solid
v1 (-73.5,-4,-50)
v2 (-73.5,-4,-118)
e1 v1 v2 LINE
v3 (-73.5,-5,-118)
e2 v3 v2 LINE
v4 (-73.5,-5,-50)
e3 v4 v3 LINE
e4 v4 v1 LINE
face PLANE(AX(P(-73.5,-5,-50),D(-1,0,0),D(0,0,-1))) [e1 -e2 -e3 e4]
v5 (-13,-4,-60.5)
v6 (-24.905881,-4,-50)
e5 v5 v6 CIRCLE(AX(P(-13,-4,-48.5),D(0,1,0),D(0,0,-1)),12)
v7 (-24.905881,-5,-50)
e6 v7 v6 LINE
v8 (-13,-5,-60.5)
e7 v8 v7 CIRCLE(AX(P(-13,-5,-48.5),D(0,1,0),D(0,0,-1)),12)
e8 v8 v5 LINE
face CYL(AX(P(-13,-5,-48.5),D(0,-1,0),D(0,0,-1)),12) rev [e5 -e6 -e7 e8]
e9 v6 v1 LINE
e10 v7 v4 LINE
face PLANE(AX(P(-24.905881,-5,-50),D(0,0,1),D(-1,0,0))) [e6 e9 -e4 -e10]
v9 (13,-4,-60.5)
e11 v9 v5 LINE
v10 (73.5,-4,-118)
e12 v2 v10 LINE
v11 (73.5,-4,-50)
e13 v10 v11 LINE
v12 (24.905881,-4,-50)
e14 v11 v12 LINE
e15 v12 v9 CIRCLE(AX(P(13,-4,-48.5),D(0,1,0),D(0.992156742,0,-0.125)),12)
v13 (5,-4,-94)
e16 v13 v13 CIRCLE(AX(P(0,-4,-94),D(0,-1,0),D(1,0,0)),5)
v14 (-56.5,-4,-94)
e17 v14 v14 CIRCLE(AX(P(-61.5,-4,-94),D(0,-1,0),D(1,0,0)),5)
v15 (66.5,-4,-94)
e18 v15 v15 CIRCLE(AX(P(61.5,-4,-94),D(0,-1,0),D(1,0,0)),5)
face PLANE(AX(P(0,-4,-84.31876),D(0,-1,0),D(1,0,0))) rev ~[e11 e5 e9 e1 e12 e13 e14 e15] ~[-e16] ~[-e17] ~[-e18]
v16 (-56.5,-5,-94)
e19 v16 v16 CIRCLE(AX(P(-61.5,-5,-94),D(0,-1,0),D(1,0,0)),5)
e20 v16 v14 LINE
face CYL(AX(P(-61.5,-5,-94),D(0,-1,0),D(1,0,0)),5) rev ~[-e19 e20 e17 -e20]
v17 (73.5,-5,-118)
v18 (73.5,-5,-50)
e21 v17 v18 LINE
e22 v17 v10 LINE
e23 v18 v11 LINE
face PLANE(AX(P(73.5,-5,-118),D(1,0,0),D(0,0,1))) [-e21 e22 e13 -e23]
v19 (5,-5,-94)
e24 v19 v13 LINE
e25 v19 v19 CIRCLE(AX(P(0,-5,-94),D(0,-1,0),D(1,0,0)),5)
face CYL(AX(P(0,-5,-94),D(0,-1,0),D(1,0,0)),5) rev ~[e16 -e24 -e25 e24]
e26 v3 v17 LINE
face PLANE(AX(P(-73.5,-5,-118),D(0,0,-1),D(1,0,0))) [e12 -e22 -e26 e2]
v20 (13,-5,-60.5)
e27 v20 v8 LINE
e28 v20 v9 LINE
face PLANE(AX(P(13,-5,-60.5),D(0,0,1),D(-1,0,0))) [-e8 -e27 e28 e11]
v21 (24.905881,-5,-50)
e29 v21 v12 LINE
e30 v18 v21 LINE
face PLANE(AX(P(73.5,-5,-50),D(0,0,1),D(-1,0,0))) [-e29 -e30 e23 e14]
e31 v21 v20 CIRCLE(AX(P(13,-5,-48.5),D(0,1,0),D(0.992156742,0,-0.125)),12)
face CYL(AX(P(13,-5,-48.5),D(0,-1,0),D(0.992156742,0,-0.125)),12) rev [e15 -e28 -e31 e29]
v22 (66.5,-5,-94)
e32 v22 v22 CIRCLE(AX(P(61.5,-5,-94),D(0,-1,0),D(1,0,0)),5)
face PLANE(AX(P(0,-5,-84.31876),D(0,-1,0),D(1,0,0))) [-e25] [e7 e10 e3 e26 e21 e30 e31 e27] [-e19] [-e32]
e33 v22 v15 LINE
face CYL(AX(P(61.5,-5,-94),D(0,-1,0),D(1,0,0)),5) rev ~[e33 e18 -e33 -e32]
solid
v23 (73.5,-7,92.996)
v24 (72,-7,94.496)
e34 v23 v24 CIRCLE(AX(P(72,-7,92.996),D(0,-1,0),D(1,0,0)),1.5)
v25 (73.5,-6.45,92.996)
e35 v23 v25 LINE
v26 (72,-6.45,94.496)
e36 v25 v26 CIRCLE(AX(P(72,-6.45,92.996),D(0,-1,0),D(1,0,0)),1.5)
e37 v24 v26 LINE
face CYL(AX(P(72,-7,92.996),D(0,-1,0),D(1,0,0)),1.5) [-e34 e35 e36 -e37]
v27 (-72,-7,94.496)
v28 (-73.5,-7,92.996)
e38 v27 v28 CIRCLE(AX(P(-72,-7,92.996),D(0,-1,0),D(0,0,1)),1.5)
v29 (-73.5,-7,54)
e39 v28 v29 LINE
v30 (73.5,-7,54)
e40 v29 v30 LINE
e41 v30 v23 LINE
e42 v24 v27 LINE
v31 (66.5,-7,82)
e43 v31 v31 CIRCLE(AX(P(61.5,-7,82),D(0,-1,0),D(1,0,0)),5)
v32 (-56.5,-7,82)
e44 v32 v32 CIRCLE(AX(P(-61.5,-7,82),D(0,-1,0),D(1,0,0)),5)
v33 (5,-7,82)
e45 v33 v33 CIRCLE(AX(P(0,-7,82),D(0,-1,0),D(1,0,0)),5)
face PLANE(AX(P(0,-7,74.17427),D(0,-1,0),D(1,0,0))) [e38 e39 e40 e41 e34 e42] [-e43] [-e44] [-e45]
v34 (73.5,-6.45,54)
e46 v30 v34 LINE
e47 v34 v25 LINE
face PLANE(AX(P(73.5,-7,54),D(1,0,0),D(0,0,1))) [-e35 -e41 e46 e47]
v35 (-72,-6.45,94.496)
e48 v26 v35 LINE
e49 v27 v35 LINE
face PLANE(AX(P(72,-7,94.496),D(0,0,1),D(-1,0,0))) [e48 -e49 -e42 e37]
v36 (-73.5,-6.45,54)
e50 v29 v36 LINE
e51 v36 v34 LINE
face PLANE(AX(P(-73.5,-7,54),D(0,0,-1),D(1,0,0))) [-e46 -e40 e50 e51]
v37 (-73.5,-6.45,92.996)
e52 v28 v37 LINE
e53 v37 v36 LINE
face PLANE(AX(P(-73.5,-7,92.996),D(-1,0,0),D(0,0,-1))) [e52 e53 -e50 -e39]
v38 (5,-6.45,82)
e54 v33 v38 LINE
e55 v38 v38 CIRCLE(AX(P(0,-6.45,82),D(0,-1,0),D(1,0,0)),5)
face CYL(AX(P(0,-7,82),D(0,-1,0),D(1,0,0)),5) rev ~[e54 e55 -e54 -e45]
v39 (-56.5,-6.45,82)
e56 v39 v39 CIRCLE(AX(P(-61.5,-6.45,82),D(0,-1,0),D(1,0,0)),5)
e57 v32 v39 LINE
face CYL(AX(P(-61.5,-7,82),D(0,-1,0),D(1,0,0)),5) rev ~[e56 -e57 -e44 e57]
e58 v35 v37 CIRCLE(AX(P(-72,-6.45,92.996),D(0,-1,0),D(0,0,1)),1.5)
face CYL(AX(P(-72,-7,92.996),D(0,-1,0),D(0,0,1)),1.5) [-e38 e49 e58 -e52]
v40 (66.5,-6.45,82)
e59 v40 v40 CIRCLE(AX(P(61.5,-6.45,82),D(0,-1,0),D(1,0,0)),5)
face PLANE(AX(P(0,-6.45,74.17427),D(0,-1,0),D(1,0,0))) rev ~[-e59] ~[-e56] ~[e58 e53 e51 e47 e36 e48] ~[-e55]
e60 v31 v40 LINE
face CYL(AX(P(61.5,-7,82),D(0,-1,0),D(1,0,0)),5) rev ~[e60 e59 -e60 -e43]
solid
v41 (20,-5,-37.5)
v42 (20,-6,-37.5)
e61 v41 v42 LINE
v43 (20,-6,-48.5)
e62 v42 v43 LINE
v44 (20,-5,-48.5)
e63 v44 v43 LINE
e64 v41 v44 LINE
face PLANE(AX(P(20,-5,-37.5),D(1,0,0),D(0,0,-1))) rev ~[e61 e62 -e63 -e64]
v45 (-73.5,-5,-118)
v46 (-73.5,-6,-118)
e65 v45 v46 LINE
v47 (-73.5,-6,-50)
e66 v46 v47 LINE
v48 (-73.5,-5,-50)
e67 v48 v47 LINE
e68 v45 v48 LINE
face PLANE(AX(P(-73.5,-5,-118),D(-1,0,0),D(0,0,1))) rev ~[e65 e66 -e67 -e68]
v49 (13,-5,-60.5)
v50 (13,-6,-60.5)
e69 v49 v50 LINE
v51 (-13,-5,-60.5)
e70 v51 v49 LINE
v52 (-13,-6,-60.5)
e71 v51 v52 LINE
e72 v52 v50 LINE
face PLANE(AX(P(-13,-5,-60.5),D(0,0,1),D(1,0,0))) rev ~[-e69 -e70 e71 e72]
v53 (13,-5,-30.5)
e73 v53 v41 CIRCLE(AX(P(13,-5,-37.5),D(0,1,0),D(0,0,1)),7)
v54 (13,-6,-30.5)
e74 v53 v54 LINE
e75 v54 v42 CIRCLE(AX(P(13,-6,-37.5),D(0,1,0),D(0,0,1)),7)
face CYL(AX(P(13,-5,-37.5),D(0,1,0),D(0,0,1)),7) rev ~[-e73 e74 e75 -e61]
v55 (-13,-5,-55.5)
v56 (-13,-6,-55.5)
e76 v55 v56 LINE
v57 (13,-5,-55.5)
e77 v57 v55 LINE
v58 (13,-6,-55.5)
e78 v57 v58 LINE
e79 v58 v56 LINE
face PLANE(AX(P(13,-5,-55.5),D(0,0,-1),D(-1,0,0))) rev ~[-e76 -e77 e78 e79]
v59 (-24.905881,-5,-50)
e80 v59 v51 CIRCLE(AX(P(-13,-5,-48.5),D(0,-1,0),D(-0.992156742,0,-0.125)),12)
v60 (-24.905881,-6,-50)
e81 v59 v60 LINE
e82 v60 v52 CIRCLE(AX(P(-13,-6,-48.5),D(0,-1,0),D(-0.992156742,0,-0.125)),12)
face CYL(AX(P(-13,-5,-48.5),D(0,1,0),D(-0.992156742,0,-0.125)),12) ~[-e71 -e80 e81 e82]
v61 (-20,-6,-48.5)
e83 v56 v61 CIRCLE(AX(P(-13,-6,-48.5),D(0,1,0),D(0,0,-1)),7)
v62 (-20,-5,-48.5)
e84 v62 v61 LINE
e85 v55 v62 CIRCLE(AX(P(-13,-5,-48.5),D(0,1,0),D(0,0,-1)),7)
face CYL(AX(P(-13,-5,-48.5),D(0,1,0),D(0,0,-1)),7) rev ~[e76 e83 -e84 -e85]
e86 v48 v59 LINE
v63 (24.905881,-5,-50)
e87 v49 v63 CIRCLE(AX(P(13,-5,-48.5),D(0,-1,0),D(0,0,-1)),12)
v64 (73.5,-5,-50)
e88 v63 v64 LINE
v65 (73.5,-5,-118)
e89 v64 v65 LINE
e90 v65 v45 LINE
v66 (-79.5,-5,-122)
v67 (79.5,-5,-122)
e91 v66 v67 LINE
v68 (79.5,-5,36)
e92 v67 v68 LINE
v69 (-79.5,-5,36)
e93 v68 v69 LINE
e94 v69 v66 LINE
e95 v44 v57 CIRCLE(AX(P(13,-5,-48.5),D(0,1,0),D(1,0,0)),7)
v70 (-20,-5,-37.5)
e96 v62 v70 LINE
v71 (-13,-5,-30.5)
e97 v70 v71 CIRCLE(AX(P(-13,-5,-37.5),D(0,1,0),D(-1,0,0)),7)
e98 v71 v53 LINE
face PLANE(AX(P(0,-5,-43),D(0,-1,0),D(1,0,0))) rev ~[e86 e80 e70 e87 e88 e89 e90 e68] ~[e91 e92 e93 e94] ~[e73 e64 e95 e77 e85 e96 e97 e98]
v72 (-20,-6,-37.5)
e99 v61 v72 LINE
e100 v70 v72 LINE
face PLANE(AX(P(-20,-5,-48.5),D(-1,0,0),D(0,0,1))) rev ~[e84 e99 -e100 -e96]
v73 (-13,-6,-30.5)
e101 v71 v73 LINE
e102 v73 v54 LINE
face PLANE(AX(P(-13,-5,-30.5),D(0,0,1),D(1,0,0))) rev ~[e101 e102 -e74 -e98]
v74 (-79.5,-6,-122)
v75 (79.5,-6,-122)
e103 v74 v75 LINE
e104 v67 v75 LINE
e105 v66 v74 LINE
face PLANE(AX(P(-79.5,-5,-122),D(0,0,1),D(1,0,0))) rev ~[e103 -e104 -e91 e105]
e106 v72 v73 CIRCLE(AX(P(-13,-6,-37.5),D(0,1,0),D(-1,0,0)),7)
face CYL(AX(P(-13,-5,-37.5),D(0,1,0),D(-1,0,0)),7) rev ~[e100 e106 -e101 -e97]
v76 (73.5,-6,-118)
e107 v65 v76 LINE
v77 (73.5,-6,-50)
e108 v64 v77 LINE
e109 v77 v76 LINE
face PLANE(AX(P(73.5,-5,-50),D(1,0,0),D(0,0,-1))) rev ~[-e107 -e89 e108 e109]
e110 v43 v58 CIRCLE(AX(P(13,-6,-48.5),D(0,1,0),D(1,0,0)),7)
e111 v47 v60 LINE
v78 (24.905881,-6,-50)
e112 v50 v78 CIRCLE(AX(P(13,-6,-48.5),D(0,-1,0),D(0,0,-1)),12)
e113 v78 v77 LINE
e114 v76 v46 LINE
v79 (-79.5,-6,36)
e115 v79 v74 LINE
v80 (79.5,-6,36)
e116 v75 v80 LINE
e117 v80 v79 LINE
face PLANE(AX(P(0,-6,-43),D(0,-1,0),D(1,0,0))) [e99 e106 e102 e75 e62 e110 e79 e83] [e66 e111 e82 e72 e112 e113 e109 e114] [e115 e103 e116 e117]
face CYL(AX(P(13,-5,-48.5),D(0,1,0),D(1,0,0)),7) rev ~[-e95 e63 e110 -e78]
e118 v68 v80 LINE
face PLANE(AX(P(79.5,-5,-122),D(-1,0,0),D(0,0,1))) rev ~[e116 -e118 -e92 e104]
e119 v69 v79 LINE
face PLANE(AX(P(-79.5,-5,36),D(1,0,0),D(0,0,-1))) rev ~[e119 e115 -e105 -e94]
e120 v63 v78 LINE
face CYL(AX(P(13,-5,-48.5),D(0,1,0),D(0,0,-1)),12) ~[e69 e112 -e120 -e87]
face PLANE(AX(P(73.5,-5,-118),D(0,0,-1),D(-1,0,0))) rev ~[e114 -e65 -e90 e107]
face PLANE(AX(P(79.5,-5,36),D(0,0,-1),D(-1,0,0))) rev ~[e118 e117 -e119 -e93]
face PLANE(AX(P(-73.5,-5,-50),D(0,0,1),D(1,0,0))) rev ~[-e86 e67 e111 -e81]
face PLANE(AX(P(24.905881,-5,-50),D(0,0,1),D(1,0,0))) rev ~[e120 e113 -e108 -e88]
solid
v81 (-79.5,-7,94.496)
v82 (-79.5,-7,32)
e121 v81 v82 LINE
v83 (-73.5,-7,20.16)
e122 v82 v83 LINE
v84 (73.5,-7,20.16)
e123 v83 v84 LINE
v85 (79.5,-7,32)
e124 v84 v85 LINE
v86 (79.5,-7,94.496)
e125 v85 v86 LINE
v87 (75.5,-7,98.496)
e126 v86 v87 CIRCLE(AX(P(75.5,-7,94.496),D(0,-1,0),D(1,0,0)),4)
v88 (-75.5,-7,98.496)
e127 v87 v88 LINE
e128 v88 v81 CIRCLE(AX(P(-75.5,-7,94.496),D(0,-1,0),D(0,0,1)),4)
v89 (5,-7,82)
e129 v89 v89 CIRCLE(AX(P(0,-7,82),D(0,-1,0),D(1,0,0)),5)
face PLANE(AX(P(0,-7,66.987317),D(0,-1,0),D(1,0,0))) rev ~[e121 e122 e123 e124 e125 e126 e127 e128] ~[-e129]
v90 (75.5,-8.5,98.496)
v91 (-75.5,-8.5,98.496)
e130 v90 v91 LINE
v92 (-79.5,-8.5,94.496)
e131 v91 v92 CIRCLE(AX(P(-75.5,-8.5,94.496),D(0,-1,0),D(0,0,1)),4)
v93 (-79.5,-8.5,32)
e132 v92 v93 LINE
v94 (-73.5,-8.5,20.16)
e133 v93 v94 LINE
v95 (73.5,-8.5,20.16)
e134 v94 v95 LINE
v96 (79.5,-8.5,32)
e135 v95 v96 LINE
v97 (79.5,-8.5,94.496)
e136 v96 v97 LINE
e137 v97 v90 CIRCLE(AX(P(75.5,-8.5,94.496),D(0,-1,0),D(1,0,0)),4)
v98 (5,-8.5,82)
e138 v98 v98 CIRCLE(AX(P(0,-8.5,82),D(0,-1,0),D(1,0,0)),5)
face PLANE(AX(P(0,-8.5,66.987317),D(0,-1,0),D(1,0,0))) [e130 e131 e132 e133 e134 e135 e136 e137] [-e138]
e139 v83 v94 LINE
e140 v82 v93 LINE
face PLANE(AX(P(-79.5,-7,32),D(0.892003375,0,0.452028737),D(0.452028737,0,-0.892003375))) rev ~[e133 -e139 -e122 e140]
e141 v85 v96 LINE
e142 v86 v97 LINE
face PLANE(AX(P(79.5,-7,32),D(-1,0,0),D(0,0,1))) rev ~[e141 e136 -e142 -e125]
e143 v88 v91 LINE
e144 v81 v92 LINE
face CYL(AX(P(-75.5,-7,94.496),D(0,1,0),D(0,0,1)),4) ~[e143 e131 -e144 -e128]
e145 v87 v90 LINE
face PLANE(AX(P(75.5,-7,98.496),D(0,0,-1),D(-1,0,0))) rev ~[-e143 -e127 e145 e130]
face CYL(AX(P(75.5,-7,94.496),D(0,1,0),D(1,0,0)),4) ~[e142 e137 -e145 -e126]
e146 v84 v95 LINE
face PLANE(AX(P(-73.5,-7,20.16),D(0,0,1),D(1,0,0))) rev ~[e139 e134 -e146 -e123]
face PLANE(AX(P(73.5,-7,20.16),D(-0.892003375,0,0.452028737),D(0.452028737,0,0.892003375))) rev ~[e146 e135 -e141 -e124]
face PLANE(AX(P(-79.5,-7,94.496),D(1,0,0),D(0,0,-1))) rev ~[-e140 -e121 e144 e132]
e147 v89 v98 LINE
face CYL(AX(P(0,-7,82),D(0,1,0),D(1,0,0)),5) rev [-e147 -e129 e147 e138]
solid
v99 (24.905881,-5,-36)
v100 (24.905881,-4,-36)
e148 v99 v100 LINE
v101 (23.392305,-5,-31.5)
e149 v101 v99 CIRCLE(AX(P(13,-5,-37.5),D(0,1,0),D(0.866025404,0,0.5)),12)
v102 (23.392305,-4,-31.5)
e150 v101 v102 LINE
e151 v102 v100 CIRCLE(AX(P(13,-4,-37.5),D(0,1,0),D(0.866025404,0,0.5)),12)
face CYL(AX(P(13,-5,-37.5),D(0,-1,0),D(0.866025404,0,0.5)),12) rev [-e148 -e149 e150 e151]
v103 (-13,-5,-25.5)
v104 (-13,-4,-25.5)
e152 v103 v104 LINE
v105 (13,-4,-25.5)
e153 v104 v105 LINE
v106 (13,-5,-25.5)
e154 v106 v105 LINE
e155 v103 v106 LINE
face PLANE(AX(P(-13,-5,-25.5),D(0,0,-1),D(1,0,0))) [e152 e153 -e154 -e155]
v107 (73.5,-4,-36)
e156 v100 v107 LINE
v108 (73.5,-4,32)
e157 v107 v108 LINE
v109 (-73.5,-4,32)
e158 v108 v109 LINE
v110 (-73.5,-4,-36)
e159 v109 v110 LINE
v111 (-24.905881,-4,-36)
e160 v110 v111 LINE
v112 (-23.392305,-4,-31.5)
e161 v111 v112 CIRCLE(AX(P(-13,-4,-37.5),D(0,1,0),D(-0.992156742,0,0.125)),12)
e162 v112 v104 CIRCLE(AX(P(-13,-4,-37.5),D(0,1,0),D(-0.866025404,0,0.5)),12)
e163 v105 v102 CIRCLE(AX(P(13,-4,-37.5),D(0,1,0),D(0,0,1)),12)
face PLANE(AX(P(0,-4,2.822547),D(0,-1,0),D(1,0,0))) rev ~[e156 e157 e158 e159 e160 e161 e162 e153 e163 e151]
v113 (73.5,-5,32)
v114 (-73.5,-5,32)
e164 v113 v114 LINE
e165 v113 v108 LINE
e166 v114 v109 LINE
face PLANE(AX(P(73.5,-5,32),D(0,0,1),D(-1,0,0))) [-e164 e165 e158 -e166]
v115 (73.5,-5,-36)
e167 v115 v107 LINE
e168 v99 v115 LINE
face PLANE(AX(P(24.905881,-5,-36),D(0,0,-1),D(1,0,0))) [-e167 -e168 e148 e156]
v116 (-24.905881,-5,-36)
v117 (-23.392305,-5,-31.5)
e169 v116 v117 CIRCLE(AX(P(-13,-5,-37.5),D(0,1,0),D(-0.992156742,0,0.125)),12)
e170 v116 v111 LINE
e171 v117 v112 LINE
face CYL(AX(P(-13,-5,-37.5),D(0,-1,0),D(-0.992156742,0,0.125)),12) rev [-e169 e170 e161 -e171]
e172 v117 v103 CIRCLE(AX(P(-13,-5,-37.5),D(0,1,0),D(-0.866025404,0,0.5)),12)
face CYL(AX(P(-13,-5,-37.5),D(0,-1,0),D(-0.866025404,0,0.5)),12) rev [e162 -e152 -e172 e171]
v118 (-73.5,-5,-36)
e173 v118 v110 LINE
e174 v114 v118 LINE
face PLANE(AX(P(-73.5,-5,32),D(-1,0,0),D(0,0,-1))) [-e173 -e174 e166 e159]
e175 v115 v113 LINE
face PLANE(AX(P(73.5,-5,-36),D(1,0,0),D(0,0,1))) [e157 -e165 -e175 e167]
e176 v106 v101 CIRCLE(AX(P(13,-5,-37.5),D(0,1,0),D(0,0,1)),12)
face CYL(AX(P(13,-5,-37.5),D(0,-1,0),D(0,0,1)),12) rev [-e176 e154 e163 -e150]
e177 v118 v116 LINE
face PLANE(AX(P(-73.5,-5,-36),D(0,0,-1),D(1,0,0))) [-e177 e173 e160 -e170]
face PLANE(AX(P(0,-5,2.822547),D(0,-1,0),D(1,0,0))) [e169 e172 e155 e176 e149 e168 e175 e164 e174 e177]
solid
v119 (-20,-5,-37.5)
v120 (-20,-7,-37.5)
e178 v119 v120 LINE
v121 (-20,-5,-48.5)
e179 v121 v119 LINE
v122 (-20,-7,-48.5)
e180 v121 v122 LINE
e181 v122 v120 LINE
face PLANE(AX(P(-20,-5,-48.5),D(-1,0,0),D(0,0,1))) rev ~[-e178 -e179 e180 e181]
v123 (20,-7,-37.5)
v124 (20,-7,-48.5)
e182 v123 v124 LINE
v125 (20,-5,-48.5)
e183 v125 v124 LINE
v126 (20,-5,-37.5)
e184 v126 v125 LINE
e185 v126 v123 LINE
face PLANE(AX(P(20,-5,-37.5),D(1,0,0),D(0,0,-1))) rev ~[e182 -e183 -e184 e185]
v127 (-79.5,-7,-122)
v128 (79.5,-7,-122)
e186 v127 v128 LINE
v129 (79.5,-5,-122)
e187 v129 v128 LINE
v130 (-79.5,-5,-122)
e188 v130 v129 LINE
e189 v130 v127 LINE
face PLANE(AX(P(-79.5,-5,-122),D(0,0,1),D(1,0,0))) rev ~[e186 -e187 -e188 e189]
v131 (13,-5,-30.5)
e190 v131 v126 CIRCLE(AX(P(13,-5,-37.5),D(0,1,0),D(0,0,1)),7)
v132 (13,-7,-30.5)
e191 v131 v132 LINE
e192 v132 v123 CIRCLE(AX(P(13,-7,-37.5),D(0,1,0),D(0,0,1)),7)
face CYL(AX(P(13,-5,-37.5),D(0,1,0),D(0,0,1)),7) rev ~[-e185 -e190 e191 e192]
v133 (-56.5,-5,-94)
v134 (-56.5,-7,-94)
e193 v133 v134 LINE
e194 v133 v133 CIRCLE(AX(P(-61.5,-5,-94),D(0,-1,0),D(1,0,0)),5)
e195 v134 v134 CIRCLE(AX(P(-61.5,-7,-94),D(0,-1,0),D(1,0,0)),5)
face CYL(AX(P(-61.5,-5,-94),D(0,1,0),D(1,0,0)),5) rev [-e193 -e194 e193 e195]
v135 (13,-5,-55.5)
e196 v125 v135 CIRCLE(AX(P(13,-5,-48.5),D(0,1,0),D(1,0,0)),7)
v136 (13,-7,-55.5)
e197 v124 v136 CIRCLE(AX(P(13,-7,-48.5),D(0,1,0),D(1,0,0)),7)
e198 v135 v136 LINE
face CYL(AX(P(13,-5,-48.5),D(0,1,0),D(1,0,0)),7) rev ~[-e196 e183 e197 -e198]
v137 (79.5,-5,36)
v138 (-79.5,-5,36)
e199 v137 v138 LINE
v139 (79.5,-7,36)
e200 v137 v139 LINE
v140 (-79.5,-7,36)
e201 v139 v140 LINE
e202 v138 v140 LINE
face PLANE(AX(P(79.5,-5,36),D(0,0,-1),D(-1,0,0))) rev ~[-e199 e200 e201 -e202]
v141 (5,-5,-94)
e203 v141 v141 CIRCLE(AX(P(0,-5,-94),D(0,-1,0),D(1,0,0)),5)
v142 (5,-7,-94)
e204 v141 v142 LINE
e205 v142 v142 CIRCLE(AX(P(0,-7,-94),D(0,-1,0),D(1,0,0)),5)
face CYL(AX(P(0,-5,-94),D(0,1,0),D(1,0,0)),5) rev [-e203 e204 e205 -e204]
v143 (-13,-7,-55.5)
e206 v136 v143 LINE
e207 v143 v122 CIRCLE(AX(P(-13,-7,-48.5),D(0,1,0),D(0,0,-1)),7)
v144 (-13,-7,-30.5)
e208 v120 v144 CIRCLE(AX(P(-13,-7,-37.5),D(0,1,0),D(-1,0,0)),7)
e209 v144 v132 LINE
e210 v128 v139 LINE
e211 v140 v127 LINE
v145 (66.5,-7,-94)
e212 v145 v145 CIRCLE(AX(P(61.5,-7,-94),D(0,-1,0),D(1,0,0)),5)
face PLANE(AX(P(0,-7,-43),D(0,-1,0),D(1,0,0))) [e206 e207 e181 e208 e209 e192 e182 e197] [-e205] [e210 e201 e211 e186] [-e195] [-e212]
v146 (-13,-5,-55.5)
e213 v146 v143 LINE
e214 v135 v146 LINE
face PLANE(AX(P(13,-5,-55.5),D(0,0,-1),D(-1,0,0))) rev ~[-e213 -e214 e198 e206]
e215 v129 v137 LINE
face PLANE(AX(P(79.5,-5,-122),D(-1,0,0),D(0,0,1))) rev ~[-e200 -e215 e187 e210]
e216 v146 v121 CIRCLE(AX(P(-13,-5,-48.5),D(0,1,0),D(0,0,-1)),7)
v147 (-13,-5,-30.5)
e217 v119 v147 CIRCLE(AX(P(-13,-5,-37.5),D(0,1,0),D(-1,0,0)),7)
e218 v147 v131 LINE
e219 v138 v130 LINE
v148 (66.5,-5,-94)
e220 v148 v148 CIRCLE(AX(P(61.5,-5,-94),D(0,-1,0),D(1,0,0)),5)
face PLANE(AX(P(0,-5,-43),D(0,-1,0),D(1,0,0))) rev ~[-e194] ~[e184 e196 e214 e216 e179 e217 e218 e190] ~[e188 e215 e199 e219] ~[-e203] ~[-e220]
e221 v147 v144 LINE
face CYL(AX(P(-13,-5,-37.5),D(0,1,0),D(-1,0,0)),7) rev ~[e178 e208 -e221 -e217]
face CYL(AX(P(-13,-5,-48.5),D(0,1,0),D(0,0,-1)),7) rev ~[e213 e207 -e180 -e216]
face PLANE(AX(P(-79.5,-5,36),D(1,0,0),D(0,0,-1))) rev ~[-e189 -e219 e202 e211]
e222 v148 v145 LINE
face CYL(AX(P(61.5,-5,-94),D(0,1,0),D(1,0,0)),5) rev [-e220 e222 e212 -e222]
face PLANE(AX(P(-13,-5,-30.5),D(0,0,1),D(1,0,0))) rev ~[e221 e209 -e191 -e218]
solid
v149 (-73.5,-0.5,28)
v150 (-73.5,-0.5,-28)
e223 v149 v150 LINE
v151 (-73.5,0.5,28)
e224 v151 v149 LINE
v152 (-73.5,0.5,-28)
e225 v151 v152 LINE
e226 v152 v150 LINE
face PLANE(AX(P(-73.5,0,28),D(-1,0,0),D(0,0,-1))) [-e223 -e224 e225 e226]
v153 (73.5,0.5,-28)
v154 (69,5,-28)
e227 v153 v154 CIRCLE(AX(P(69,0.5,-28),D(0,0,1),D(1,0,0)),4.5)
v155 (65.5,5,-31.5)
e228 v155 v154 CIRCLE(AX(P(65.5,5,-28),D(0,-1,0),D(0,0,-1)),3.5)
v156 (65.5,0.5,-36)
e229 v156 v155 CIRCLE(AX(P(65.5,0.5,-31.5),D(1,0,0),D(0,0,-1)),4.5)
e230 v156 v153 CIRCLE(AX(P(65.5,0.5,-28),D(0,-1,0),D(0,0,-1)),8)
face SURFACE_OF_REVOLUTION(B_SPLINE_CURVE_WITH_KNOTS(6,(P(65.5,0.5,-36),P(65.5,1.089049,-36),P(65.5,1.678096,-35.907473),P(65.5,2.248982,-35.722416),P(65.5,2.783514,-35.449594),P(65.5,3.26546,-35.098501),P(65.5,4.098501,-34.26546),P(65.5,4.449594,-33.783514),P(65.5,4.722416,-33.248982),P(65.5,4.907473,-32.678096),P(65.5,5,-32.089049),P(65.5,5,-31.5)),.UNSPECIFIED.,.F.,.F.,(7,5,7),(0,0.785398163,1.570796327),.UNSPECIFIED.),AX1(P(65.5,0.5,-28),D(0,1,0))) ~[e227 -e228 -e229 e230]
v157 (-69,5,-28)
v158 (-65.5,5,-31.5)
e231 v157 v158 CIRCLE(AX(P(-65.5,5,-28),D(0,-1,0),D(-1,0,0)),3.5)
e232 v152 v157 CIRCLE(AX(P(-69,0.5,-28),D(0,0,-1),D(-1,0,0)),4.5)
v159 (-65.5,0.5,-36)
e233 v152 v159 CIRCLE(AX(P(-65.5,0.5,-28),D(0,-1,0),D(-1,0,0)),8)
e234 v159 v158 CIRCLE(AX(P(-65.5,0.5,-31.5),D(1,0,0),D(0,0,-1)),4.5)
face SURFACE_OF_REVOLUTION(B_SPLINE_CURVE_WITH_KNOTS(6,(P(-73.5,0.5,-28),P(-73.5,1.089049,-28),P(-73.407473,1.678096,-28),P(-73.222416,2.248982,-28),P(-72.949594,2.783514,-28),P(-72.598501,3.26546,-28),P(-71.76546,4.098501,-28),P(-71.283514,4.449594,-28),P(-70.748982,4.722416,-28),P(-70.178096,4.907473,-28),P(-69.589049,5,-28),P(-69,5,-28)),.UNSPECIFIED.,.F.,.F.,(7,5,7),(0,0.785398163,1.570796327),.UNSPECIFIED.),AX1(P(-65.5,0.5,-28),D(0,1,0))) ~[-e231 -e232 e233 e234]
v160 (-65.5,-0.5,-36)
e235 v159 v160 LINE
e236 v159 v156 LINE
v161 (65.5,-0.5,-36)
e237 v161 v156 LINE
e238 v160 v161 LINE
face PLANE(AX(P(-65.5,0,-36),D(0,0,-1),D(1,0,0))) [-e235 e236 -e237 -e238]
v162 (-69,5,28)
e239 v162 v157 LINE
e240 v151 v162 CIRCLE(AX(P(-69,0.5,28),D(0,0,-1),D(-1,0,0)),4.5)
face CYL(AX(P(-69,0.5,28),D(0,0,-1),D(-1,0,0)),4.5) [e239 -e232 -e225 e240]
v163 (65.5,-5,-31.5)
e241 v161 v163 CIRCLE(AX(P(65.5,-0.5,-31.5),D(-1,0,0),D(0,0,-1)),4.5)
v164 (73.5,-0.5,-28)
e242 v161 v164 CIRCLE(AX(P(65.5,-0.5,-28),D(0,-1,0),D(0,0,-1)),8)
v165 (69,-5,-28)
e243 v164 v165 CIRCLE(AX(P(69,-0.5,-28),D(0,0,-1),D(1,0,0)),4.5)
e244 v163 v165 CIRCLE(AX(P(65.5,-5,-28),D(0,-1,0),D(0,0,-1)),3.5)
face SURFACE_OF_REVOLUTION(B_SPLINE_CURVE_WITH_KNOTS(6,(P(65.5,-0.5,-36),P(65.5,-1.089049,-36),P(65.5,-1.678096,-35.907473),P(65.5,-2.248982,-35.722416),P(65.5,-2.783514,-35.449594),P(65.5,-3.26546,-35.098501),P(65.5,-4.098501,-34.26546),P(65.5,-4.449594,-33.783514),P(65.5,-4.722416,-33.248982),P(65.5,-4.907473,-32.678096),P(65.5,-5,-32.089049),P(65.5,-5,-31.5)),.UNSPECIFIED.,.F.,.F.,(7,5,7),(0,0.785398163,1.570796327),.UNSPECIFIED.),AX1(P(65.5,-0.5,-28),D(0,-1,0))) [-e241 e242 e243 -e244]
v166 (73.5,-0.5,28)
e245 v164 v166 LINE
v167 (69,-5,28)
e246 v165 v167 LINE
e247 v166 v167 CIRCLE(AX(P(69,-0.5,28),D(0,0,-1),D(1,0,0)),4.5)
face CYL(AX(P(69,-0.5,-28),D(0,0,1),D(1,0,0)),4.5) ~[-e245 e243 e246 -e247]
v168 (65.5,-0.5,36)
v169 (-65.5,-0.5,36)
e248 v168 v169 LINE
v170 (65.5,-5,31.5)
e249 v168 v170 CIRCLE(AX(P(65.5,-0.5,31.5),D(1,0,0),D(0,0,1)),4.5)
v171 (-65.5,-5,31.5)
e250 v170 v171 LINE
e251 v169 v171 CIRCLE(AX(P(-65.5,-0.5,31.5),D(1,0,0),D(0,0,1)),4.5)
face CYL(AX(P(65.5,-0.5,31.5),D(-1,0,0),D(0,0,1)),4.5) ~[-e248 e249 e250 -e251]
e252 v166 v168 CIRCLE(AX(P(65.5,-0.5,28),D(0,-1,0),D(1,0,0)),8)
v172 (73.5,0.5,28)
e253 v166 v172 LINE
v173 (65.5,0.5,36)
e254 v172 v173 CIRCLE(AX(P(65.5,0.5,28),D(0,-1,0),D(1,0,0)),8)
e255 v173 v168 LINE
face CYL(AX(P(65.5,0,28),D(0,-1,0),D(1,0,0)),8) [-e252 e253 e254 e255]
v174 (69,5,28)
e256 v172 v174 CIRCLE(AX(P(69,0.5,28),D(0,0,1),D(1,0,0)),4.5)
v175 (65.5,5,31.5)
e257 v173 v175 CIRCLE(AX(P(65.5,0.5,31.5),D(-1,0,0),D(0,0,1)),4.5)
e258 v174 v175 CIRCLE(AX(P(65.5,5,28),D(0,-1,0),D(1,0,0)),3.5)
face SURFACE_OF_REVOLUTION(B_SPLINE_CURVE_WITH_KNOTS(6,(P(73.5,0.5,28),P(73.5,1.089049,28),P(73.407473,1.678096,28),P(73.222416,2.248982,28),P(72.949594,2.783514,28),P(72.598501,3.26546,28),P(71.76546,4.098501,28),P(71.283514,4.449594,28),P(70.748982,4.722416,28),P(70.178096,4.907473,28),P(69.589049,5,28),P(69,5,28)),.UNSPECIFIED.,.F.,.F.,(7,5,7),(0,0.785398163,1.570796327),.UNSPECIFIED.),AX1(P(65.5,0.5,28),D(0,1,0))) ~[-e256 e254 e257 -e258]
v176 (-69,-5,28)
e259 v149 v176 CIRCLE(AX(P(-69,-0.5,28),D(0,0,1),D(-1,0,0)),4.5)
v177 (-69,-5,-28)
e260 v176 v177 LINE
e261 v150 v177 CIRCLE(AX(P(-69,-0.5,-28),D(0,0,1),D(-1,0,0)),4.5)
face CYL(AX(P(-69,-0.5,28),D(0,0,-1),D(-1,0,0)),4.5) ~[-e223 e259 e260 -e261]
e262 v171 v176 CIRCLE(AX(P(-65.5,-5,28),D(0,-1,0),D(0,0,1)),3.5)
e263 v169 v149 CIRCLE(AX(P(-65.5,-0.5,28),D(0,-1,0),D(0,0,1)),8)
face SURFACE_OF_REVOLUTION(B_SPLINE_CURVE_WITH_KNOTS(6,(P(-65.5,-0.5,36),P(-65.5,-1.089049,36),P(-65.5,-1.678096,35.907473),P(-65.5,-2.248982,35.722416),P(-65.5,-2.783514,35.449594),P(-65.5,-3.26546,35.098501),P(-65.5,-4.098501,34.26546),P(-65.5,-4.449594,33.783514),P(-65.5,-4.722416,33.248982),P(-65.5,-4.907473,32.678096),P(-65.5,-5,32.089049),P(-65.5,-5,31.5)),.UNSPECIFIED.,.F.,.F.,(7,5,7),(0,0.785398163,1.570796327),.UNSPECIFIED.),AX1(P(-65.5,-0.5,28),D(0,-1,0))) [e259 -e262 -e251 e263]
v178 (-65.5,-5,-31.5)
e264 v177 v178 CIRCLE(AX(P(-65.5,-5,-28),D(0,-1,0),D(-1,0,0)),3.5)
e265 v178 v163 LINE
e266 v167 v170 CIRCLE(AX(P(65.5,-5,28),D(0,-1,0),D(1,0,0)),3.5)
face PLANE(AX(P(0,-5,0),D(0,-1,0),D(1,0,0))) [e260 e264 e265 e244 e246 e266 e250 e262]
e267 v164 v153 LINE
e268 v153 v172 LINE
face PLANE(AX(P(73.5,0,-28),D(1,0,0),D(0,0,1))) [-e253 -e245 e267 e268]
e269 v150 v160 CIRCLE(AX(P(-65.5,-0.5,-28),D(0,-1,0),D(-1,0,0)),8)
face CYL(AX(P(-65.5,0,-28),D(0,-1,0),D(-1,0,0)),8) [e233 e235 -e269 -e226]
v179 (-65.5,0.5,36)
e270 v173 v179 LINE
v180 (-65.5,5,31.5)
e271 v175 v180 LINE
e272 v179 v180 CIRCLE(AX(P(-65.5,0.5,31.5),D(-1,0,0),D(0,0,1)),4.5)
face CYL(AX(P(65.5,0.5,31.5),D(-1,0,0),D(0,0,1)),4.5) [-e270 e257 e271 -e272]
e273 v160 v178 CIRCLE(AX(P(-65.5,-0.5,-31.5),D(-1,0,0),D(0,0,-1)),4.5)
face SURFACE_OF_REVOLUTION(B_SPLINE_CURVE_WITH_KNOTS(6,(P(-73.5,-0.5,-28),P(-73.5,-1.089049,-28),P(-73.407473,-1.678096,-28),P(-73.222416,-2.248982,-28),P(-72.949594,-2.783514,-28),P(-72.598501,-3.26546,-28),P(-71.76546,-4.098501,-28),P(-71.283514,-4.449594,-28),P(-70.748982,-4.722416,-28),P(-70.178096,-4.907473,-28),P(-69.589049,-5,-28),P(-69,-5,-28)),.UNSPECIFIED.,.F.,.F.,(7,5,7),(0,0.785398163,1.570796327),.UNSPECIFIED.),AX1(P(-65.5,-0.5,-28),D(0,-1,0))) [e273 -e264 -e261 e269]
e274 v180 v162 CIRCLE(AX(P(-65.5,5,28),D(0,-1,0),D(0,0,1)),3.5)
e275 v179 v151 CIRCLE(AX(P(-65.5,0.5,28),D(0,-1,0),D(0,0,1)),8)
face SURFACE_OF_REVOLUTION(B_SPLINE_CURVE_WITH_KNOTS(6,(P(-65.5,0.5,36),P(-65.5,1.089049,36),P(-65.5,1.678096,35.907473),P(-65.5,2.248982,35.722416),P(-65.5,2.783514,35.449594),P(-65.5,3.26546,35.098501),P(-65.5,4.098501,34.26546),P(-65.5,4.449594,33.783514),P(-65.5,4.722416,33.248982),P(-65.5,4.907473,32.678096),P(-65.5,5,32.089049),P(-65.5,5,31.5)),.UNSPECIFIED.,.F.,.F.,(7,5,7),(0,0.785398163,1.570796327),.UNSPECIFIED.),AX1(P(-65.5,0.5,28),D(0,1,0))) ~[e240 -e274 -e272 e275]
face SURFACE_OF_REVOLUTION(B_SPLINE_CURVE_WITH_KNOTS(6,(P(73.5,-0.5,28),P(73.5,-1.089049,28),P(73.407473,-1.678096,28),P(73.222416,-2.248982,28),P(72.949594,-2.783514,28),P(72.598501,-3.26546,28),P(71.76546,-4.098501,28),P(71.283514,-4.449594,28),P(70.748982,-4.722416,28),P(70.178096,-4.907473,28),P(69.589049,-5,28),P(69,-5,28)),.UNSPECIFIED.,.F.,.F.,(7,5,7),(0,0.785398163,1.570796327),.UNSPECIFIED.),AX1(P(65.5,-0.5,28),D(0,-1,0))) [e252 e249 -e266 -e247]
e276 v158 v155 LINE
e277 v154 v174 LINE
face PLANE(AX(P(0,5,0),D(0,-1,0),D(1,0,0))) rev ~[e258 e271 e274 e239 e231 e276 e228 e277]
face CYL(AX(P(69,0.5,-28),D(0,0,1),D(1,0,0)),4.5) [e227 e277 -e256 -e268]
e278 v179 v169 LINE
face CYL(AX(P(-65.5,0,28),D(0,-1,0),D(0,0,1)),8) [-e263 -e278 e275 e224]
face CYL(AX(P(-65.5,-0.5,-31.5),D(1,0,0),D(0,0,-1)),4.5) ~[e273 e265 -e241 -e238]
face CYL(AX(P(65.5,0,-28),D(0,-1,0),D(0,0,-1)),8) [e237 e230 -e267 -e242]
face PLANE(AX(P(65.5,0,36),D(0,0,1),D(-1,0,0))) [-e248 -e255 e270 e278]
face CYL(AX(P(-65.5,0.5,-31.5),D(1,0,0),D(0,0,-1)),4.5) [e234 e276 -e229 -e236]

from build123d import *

# Parameters (mm, degrees)
F1_DEPTH = 5
F2_R     = 4.5
F3_R     = 5
F4_DEPTH = 2
F5_DEPTH = 1
F6_R     = 5
F7_DEPTH = 1.5
F8_DEPTH = 0.55
F9_DEPTH = 1


# Not quite as in the source:
# - a feature names something its author has since deleted; it is built from what else it names


with BuildPart() as f1:
    # F0 (on Front) → F1 (new body, symmetric)
    with BuildSketch(Plane.XZ):
        with BuildLine():
            ThreePointArc((73.5, 28), (71.1568542495, 33.6568542495), (65.5, 36))
            Line((65.5, 36), (-65.5, 36))
            ThreePointArc((-65.5, 36), (-71.1568542495, 33.6568542495), (-73.5, 28))
            Line((-73.5, 28), (-73.5, -28))
            ThreePointArc((-73.5, -28), (-71.1568542495, -33.6568542495), (-65.5, -36))
            Line((-65.5, -36), (65.5, -36))
            ThreePointArc((65.5, -36), (71.1568542495, -33.6568542495), (73.5, -28))
            Line((73.5, -28), (73.5, 28))
        make_face()
    extrude(amount=F1_DEPTH, both=True)

    # F2
    f2_edges = [f1.edges().sort_by_distance(p)[0] for p in [
        (71.156854, -5, 33.656854),
        (0, -5, 36),
        (-71.156854, -5, 33.656854),
        (-73.5, -5, 0),
        (-71.156854, -5, -33.656854),
        (0, -5, -36),
        (71.156854, -5, -33.656854),
        (73.5, -5, 0),
        (71.156854, 5, 33.656854),
        (0, 5, 36),
        (-71.156854, 5, 33.656854),
        (-73.5, 5, 0),
        (-71.156854, 5, -33.656854),
        (0, 5, -36),
        (71.156854, 5, -33.656854),
        (73.5, 5, 0),
    ]]
    fillet(f2_edges, radius=F2_R)


with BuildPart() as f4:
    # F3 (on face) → F4 (new body)
    with BuildSketch(Plane.XZ.offset(5)):
        Polygon((65.5, 36), (-65.5, 36), (-79.5, 36), (-79.5, -122), (79.5, -122), (79.5, 36), align=None)
        with BuildLine():
            Line((-73.5, -50), (-24.9058808998, -50))
            ThreePointArc((-24.9058808998, -50), (-20.9372539332, -57.5), (-13, -60.5))
            Line((-13, -60.5), (13, -60.5))
            ThreePointArc((13, -60.5), (20.9372539332, -57.5), (24.9058808998, -50))
            Line((24.9058808998, -50), (73.5, -50))
            Line((73.5, -50), (73.5, -118))
            Line((73.5, -118), (-73.5, -118))
            Line((-73.5, -118), (-73.5, -50))
        make_face(mode=Mode.SUBTRACT)
        with BuildLine():
            ThreePointArc((-20, -37.5), (-17.9497474683, -32.5502525317), (-13, -30.5))
            Line((-13, -30.5), (13, -30.5))
            ThreePointArc((13, -30.5), (17.9497474683, -32.5502525317), (20, -37.5))
            Line((20, -37.5), (20, -48.5))
            ThreePointArc((20, -48.5), (17.9497474683, -53.4497474683), (13, -55.5))
            Line((13, -55.5), (-13, -55.5))
            ThreePointArc((-13, -55.5), (-17.9497474683, -53.4497474683), (-20, -48.5))
            Line((-20, -48.5), (-20, -37.5))
        make_face(mode=Mode.SUBTRACT)
        with BuildLine():
            Line((73.5, 32), (73.5, -36))
            Line((73.5, -36), (24.9058808998, -36))
            ThreePointArc((24.9058808998, -36), (20.9372539332, -28.5), (13, -25.5))
            Line((13, -25.5), (-13, -25.5))
            ThreePointArc((-13, -25.5), (-20.9372539332, -28.5), (-24.9058808998, -36))
            Line((-24.9058808998, -36), (-73.5, -36))
            Line((-73.5, -36), (-73.5, 32))
            Line((-73.5, 32), (73.5, 32))
        make_face(mode=Mode.SUBTRACT)
        with BuildLine():
            ThreePointArc((13, -25.5), (19, -27.1076951546), (23.3923048454, -31.5))
            Line((23.3923048454, -31.5), (65.5, -31.5))
            ThreePointArc((65.5, -31.5), (67.9748737342, -30.4748737342), (69, -28))
            Line((69, -28), (69, 28))
            ThreePointArc((69, 28), (67.9748737342, 30.4748737342), (65.5, 31.5))
            Line((65.5, 31.5), (-65.5, 31.5))
            ThreePointArc((-65.5, 31.5), (-67.9748737342, 30.4748737342), (-69, 28))
            Line((-69, 28), (-69, -28))
            ThreePointArc((-69, -28), (-67.9748737342, -30.4748737342), (-65.5, -31.5))
            Line((-65.5, -31.5), (-23.3923048454, -31.5))
            ThreePointArc((-23.3923048454, -31.5), (-19, -27.1076951546), (-13, -25.5))
            Line((-13, -25.5), (13, -25.5))
        make_face()
        with BuildLine():
            ThreePointArc((-13, -60.5), (-20.9372539332, -57.5), (-24.9058808998, -50))
            Line((-24.9058808998, -50), (-73.5, -50))
            Line((-73.5, -50), (-73.5, -118))
            Line((-73.5, -118), (73.5, -118))
            Line((73.5, -118), (73.5, -50))
            Line((73.5, -50), (24.9058808998, -50))
            ThreePointArc((24.9058808998, -50), (20.9372539332, -57.5), (13, -60.5))
            Line((13, -60.5), (-13, -60.5))
        make_face()
        with Locations((-61.5, -94)):
            Circle(F3_R, mode=Mode.SUBTRACT)
        with Locations((0, -94)):
            Circle(F3_R, mode=Mode.SUBTRACT)
        with Locations((61.5, -94)):
            Circle(F3_R, mode=Mode.SUBTRACT)
        with BuildLine():
            Line((24.9058808998, -36), (73.5, -36))
            Line((73.5, -36), (73.5, 32))
            Line((73.5, 32), (-73.5, 32))
            Line((-73.5, 32), (-73.5, -36))
            Line((-73.5, -36), (-24.9058808998, -36))
            ThreePointArc((-24.9058808998, -36), (-24.3738635424, -33.6743983325), (-23.3923048454, -31.5))
            Line((-23.3923048454, -31.5), (-65.5, -31.5))
            ThreePointArc((-65.5, -31.5), (-67.9748737342, -30.4748737342), (-69, -28))
            Line((-69, -28), (-69, 28))
            ThreePointArc((-69, 28), (-67.9748737342, 30.4748737342), (-65.5, 31.5))
            Line((-65.5, 31.5), (65.5, 31.5))
            ThreePointArc((65.5, 31.5), (67.9748737342, 30.4748737342), (69, 28))
            Line((69, 28), (69, -28))
            ThreePointArc((69, -28), (67.9748737342, -30.4748737342), (65.5, -31.5))
            Line((65.5, -31.5), (23.3923048454, -31.5))
            ThreePointArc((23.3923048454, -31.5), (24.3738635424, -33.6743983325), (24.9058808998, -36))
        make_face()
    extrude(amount=F4_DEPTH)


with BuildPart() as f5:
    # F3 (on face) → F5 (new body)
    with BuildSketch(Plane.XZ.offset(5)):
        with BuildLine():
            Line((24.9058808998, -36), (73.5, -36))
            Line((73.5, -36), (73.5, 32))
            Line((73.5, 32), (-73.5, 32))
            Line((-73.5, 32), (-73.5, -36))
            Line((-73.5, -36), (-24.9058808998, -36))
            ThreePointArc((-24.9058808998, -36), (-24.3738635424, -33.6743983325), (-23.3923048454, -31.5))
            Line((-23.3923048454, -31.5), (-65.5, -31.5))
            ThreePointArc((-65.5, -31.5), (-67.9748737342, -30.4748737342), (-69, -28))
            Line((-69, -28), (-69, 28))
            ThreePointArc((-69, 28), (-67.9748737342, 30.4748737342), (-65.5, 31.5))
            Line((-65.5, 31.5), (65.5, 31.5))
            ThreePointArc((65.5, 31.5), (67.9748737342, 30.4748737342), (69, 28))
            Line((69, 28), (69, -28))
            ThreePointArc((69, -28), (67.9748737342, -30.4748737342), (65.5, -31.5))
            Line((65.5, -31.5), (23.3923048454, -31.5))
            ThreePointArc((23.3923048454, -31.5), (24.3738635424, -33.6743983325), (24.9058808998, -36))
        make_face()
        with BuildLine():
            ThreePointArc((13, -25.5), (19, -27.1076951546), (23.3923048454, -31.5))
            Line((23.3923048454, -31.5), (65.5, -31.5))
            ThreePointArc((65.5, -31.5), (67.9748737342, -30.4748737342), (69, -28))
            Line((69, -28), (69, 28))
            ThreePointArc((69, 28), (67.9748737342, 30.4748737342), (65.5, 31.5))
            Line((65.5, 31.5), (-65.5, 31.5))
            ThreePointArc((-65.5, 31.5), (-67.9748737342, 30.4748737342), (-69, 28))
            Line((-69, 28), (-69, -28))
            ThreePointArc((-69, -28), (-67.9748737342, -30.4748737342), (-65.5, -31.5))
            Line((-65.5, -31.5), (-23.3923048454, -31.5))
            ThreePointArc((-23.3923048454, -31.5), (-19, -27.1076951546), (-13, -25.5))
            Line((-13, -25.5), (13, -25.5))
        make_face()
    extrude(amount=-F5_DEPTH)


with BuildPart() as f5b:
    # F3 (on face) → F5, piece 2 (new body)
    with BuildSketch(Plane.XZ.offset(5)):
        with BuildLine():
            ThreePointArc((-13, -60.5), (-20.9372539332, -57.5), (-24.9058808998, -50))
            Line((-24.9058808998, -50), (-73.5, -50))
            Line((-73.5, -50), (-73.5, -118))
            Line((-73.5, -118), (73.5, -118))
            Line((73.5, -118), (73.5, -50))
            Line((73.5, -50), (24.9058808998, -50))
            ThreePointArc((24.9058808998, -50), (20.9372539332, -57.5), (13, -60.5))
            Line((13, -60.5), (-13, -60.5))
        make_face()
        with Locations((-61.5, -94)):
            Circle(F3_R, mode=Mode.SUBTRACT)
        with Locations((0, -94)):
            Circle(F3_R, mode=Mode.SUBTRACT)
        with Locations((61.5, -94)):
            Circle(F3_R, mode=Mode.SUBTRACT)
    extrude(amount=-F5_DEPTH)


with BuildPart() as f7:
    # F6 (on face) → F7 (new body)
    with BuildSketch(Plane.XZ.offset(7)):
        with BuildLine():
            ThreePointArc((-75.5, 98.496), (-78.3284271247, 97.3244271247), (-79.5, 94.496))
            Line((-79.5, 94.496), (-79.5, 36))
            Line((-79.5, 36), (79.5, 36))
            Line((79.5, 36), (79.5, 94.496))
            ThreePointArc((79.5, 94.496), (78.3284271247, 97.3244271247), (75.5, 98.496))
            Line((75.5, 98.496), (0, 98.496))
            Line((0, 98.496), (-75.5, 98.496))
        make_face()
        with BuildLine():
            Line((73.5, 54), (-73.5, 54))
            Line((-73.5, 54), (-73.5, 92.996))
            ThreePointArc((-73.5, 92.996), (-73.0606601718, 94.0566601718), (-72, 94.496))
            Line((-72, 94.496), (72, 94.496))
            ThreePointArc((72, 94.496), (73.0606601718, 94.0566601718), (73.5, 92.996))
            Line((73.5, 92.996), (73.5, 54))
        make_face(mode=Mode.SUBTRACT)
        Polygon((79.5, 36), (-79.5, 36), (-79.5, 32), (-73.5, 20.16), (0, 20.16), (73.5, 20.16), (79.5, 32), align=None)
        with BuildLine():
            Line((-73.5, 92.996), (-73.5, 54))
            Line((-73.5, 54), (73.5, 54))
            Line((73.5, 54), (73.5, 92.996))
            ThreePointArc((73.5, 92.996), (73.0606601718, 94.0566601718), (72, 94.496))
            Line((72, 94.496), (-72, 94.496))
            ThreePointArc((-72, 94.496), (-73.0606601718, 94.0566601718), (-73.5, 92.996))
        make_face()
        with Locations((-61.5, 82)):
            Circle(F6_R, mode=Mode.SUBTRACT)
        with Locations((0, 82)):
            Circle(F6_R, mode=Mode.SUBTRACT)
        with Locations((61.5, 82)):
            Circle(F6_R, mode=Mode.SUBTRACT)
        with Locations((61.5, 82)):
            Circle(F6_R)
        with Locations((-61.5, 82)):
            Circle(F6_R)
    extrude(amount=F7_DEPTH)


with BuildPart() as f8:
    # F6 (on face) → F8 (new body)
    with BuildSketch(Plane.XZ.offset(7)):
        with BuildLine():
            Line((-73.5, 92.996), (-73.5, 54))
            Line((-73.5, 54), (73.5, 54))
            Line((73.5, 54), (73.5, 92.996))
            ThreePointArc((73.5, 92.996), (73.0606601718, 94.0566601718), (72, 94.496))
            Line((72, 94.496), (-72, 94.496))
            ThreePointArc((-72, 94.496), (-73.0606601718, 94.0566601718), (-73.5, 92.996))
        make_face()
        with Locations((-61.5, 82)):
            Circle(F6_R, mode=Mode.SUBTRACT)
        with Locations((0, 82)):
            Circle(F6_R, mode=Mode.SUBTRACT)
        with Locations((61.5, 82)):
            Circle(F6_R, mode=Mode.SUBTRACT)
    extrude(amount=-F8_DEPTH)


with BuildPart() as f9:
    # F3 (on face) → F9 (new body)
    with BuildSketch(Plane.XZ.offset(5)):
        Polygon((65.5, 36), (-65.5, 36), (-79.5, 36), (-79.5, -122), (79.5, -122), (79.5, 36), align=None)
        with BuildLine():
            Line((-73.5, -50), (-24.9058808998, -50))
            ThreePointArc((-24.9058808998, -50), (-20.9372539332, -57.5), (-13, -60.5))
            Line((-13, -60.5), (13, -60.5))
            ThreePointArc((13, -60.5), (20.9372539332, -57.5), (24.9058808998, -50))
            Line((24.9058808998, -50), (73.5, -50))
            Line((73.5, -50), (73.5, -118))
            Line((73.5, -118), (-73.5, -118))
            Line((-73.5, -118), (-73.5, -50))
        make_face(mode=Mode.SUBTRACT)
        with BuildLine():
            ThreePointArc((-20, -37.5), (-17.9497474683, -32.5502525317), (-13, -30.5))
            Line((-13, -30.5), (13, -30.5))
            ThreePointArc((13, -30.5), (17.9497474683, -32.5502525317), (20, -37.5))
            Line((20, -37.5), (20, -48.5))
            ThreePointArc((20, -48.5), (17.9497474683, -53.4497474683), (13, -55.5))
            Line((13, -55.5), (-13, -55.5))
            ThreePointArc((-13, -55.5), (-17.9497474683, -53.4497474683), (-20, -48.5))
            Line((-20, -48.5), (-20, -37.5))
        make_face(mode=Mode.SUBTRACT)
        with BuildLine():
            Line((73.5, 32), (73.5, -36))
            Line((73.5, -36), (24.9058808998, -36))
            ThreePointArc((24.9058808998, -36), (20.9372539332, -28.5), (13, -25.5))
            Line((13, -25.5), (-13, -25.5))
            ThreePointArc((-13, -25.5), (-20.9372539332, -28.5), (-24.9058808998, -36))
            Line((-24.9058808998, -36), (-73.5, -36))
            Line((-73.5, -36), (-73.5, 32))
            Line((-73.5, 32), (73.5, 32))
        make_face(mode=Mode.SUBTRACT)
        with BuildLine():
            Line((24.9058808998, -36), (73.5, -36))
            Line((73.5, -36), (73.5, 32))
            Line((73.5, 32), (-73.5, 32))
            Line((-73.5, 32), (-73.5, -36))
            Line((-73.5, -36), (-24.9058808998, -36))
            ThreePointArc((-24.9058808998, -36), (-24.3738635424, -33.6743983325), (-23.3923048454, -31.5))
            Line((-23.3923048454, -31.5), (-65.5, -31.5))
            ThreePointArc((-65.5, -31.5), (-67.9748737342, -30.4748737342), (-69, -28))
            Line((-69, -28), (-69, 28))
            ThreePointArc((-69, 28), (-67.9748737342, 30.4748737342), (-65.5, 31.5))
            Line((-65.5, 31.5), (65.5, 31.5))
            ThreePointArc((65.5, 31.5), (67.9748737342, 30.4748737342), (69, 28))
            Line((69, 28), (69, -28))
            ThreePointArc((69, -28), (67.9748737342, -30.4748737342), (65.5, -31.5))
            Line((65.5, -31.5), (23.3923048454, -31.5))
            ThreePointArc((23.3923048454, -31.5), (24.3738635424, -33.6743983325), (24.9058808998, -36))
        make_face()
        with BuildLine():
            ThreePointArc((13, -25.5), (19, -27.1076951546), (23.3923048454, -31.5))
            Line((23.3923048454, -31.5), (65.5, -31.5))
            ThreePointArc((65.5, -31.5), (67.9748737342, -30.4748737342), (69, -28))
            Line((69, -28), (69, 28))
            ThreePointArc((69, 28), (67.9748737342, 30.4748737342), (65.5, 31.5))
            Line((65.5, 31.5), (-65.5, 31.5))
            ThreePointArc((-65.5, 31.5), (-67.9748737342, 30.4748737342), (-69, 28))
            Line((-69, 28), (-69, -28))
            ThreePointArc((-69, -28), (-67.9748737342, -30.4748737342), (-65.5, -31.5))
            Line((-65.5, -31.5), (-23.3923048454, -31.5))
            ThreePointArc((-23.3923048454, -31.5), (-19, -27.1076951546), (-13, -25.5))
            Line((-13, -25.5), (13, -25.5))
        make_face()
    extrude(amount=F9_DEPTH)


solid = Compound([f1.part, f4.part, f5.part, f5b.part, f7.part, f8.part, f9.part])
